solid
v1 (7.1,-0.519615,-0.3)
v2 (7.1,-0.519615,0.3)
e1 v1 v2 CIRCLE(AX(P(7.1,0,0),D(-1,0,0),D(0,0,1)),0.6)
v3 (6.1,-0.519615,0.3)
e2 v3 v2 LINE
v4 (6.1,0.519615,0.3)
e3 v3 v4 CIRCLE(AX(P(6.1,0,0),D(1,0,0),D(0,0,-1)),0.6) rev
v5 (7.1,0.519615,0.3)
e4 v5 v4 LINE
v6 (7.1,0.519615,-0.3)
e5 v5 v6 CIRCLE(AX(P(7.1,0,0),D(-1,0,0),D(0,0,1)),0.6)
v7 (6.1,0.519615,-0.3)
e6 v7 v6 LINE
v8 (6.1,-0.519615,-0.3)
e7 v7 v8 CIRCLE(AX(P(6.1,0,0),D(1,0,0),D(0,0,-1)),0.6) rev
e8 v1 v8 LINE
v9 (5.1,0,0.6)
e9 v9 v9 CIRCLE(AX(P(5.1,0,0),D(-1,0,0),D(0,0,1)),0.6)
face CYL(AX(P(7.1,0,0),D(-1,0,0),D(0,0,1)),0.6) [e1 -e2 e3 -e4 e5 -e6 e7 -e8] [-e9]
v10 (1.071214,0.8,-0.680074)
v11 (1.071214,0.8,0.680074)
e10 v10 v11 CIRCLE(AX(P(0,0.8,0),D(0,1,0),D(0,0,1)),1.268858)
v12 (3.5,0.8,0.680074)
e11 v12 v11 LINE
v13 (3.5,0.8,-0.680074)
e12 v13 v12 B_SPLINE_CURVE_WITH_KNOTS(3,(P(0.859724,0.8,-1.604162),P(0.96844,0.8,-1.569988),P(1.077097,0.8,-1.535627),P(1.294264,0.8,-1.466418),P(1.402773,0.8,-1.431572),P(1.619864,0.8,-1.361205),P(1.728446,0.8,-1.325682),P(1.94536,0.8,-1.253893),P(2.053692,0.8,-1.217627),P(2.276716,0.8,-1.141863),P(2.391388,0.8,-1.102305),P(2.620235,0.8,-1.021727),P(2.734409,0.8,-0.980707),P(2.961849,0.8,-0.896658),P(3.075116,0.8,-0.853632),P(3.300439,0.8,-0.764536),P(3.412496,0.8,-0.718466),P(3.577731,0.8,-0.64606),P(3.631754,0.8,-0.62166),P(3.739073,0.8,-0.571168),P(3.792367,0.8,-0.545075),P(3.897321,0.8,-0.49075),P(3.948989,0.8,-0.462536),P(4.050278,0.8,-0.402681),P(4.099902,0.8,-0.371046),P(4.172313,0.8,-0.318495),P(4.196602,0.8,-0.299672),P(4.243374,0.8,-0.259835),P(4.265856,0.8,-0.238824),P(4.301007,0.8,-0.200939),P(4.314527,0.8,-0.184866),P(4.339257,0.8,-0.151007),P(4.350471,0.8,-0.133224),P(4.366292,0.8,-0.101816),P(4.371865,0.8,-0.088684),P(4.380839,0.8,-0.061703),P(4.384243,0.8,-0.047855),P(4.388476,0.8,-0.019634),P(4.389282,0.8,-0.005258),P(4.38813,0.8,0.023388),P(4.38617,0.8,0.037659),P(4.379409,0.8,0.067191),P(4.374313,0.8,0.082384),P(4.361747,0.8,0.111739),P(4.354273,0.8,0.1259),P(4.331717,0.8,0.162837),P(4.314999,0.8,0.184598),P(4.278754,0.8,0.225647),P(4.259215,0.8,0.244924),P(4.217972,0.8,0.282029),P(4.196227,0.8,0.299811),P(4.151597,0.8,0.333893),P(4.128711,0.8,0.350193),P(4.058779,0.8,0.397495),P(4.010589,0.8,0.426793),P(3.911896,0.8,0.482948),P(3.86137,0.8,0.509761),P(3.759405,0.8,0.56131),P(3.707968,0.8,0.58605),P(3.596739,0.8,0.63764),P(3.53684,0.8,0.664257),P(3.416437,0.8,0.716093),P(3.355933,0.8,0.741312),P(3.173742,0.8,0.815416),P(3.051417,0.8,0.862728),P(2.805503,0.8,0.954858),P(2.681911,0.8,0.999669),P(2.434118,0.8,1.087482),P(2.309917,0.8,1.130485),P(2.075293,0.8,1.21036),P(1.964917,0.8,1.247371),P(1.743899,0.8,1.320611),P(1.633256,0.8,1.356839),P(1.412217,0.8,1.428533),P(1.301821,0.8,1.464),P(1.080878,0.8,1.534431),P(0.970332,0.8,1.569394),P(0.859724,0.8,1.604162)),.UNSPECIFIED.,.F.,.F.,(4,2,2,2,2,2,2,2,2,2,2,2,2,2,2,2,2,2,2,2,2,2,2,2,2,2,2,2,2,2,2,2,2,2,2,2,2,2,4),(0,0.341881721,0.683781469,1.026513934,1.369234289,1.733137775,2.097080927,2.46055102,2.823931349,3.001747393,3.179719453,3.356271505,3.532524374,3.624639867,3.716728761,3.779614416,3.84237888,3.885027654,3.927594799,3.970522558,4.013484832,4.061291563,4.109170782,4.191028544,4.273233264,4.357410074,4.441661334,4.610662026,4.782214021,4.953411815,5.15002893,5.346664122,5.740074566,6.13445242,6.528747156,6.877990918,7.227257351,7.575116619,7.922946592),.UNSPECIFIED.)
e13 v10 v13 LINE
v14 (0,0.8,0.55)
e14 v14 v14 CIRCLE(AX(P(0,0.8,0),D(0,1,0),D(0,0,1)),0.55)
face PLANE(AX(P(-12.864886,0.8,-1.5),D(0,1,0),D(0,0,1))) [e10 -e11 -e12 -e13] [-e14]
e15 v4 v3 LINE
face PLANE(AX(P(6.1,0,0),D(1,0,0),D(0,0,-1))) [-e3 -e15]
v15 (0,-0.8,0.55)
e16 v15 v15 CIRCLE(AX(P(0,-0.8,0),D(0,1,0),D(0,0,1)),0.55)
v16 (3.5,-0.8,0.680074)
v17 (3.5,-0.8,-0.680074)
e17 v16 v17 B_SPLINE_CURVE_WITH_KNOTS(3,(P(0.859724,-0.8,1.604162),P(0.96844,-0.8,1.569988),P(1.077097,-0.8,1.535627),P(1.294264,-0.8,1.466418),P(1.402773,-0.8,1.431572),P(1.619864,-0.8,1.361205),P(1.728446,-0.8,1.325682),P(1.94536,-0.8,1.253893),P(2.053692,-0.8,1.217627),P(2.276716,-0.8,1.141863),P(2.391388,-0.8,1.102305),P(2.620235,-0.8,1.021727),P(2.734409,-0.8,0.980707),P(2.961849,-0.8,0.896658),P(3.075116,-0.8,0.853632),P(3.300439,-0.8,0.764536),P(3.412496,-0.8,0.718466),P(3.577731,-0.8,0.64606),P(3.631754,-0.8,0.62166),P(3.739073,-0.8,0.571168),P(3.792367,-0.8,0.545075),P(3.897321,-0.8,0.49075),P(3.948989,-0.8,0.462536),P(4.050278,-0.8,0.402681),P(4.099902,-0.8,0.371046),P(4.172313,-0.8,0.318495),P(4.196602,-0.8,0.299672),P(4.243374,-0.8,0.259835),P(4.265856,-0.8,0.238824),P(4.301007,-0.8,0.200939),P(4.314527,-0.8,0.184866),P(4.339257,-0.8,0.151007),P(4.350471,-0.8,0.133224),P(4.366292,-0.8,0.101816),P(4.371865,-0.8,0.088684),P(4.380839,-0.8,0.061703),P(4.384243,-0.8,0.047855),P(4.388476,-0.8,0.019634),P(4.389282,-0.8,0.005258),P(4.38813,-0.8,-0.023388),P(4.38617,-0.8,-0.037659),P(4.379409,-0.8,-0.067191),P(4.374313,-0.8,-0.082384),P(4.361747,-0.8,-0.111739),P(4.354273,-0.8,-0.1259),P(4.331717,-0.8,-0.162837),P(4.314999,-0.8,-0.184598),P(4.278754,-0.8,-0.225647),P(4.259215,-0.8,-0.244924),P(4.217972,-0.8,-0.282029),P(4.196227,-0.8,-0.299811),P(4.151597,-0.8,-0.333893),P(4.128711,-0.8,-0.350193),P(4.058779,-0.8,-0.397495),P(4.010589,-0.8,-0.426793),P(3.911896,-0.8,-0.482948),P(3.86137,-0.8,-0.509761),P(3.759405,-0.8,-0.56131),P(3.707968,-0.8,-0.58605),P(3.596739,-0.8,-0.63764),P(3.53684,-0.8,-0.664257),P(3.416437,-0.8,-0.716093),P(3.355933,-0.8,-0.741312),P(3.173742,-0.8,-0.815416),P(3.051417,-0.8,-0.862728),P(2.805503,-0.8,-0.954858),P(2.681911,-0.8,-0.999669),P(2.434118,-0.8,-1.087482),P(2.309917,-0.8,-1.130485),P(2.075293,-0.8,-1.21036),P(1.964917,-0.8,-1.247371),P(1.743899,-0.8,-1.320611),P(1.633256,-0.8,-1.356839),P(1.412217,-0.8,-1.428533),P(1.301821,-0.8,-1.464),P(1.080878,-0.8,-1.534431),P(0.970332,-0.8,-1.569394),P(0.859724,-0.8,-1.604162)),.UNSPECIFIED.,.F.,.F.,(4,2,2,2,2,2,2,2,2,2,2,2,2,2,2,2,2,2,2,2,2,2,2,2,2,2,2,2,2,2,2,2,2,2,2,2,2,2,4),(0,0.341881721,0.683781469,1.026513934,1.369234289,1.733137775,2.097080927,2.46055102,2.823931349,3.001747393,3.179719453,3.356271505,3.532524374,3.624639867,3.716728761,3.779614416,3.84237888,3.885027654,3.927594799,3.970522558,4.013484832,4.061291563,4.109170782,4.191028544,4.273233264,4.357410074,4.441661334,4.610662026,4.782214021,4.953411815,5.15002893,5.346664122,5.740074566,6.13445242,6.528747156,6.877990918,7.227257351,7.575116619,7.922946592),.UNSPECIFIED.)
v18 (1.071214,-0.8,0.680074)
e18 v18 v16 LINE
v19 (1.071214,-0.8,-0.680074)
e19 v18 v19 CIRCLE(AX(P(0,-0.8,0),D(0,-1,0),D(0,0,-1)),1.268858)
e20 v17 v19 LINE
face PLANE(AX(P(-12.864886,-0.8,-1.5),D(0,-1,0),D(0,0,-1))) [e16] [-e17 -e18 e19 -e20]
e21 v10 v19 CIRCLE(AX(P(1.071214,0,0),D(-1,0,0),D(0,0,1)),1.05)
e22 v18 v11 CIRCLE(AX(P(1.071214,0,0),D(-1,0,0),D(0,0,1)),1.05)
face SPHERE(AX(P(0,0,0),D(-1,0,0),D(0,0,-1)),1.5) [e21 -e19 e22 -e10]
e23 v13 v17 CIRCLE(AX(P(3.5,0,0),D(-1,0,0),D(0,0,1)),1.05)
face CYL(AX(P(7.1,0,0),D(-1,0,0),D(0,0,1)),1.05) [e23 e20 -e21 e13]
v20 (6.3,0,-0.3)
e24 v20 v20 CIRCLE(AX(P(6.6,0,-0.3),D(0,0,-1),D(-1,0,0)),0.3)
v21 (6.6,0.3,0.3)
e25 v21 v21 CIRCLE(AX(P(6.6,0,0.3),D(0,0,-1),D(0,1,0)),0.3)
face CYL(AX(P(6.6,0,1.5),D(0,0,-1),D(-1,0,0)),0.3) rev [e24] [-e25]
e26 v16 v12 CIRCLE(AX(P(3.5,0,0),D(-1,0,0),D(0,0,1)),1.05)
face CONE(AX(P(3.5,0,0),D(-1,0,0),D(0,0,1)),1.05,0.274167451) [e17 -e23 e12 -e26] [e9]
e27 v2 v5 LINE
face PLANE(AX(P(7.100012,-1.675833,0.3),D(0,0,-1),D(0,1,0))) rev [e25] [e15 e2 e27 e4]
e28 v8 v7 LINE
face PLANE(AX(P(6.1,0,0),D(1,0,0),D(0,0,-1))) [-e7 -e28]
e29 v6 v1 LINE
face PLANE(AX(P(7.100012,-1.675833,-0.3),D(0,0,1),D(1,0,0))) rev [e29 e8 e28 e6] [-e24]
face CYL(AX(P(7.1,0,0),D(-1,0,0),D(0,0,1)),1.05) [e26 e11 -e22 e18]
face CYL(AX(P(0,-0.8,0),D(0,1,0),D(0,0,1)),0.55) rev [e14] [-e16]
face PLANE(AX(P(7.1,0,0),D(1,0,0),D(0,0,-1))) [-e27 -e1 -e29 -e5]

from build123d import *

# Parameters (mm, degrees)
CUT_EXTRUDE_START         = -1.5
CUT_EXTRUDE_1_OUTLINE_W   = 9
CUT_EXTRUDE_1_OUTLINE_H   = 6
CUT_EXTRUDE_1_DEPTH       = 0.7
CUT_EXTRUDE_START_2       = 0.8
CUT_EXTRUDE_1_2_OUTLINE_W = 9
CUT_EXTRUDE_1_2_OUTLINE_H = 6
CUT_EXTRUDE_1_2_DEPTH     = 0.7
CUT_EXTRUDE_2_DEPTH       = 8.431016081
CUT_EXTRUDE_2_DEPTH_BACK  = 8.431016081
SKETCH_4_R                = 0.55
CUT_EXTRUDE_3_DEPTH       = 9.766413178
CUT_EXTRUDE_3_DEPTH_BACK  = 1
SKETCH_5_OUTSIDE_W        = 6.85
SKETCH_5_OUTSIDE_H        = 5.45
SKETCH_5_OUTSIDE_W_2      = 0.6
SKETCH_5_OUTSIDE_H_2      = 3.351666402
SKETCH_7_R                = 0.3
CUT_EXTRUDE_5_DEPTH       = 8.368174808


# Read off the part's stored shape, not the designer's step: 切除-拉伸1
with BuildPart() as part:
    # 草图2 → 旋转1 (revolve)
    with BuildSketch(Plane(origin=(0, 0, 0), x_dir=(1, 0, 0), z_dir=(0, 1, 0)), mode=Mode.PRIVATE) as revolve_1_sk:
        with BuildLine():
            ThreePointArc((1.5, 0), (1.388672279, 0.567088443), (1.071214264, 1.05))
            ThreePointArc((1.071214264, 1.05), (-0.567088443, 1.388672279), (-1.5, 0))
            Line((-1.5, 0), (1.5, 0))
        make_face()
        with BuildLine():
            Line((3.5, 1.05), (1.071214264, 1.05))
            ThreePointArc((1.071214264, 1.05), (1.388672279, 0.567088443), (1.5, 0))
            Line((1.5, 0), (7.1, 0))
            Line((7.1, 0), (7.1, 0.6))
            Line((7.1, 0.6), (5.1, 0.6))
            Line((5.1, 0.6), (3.5, 1.05))
        make_face()
    revolve(revolve_1_sk.sketch.rotate(Axis((7.1, 0, 0), (1, 0, 0)), 180), axis=Axis((7.1, 0, 0), (1, 0, 0)))

    # 切除-拉伸1 outline → 切除-拉伸1 (cut)
    with BuildSketch(Plane(origin=(0, 0, 0), x_dir=(1, 0, 0), z_dir=(0, 1, 0)).offset(CUT_EXTRUDE_START)):
        with Locations((1.5, 0)):
            Rectangle(CUT_EXTRUDE_1_OUTLINE_W, CUT_EXTRUDE_1_OUTLINE_H)
    extrude(amount=CUT_EXTRUDE_1_DEPTH, mode=Mode.SUBTRACT)

    # Cut-Extrude 1 2 outline → Cut-Extrude 1 2 (cut)
    with BuildSketch(Plane(origin=(0, 0, 0), x_dir=(1, 0, 0), z_dir=(0, 1, 0)).offset(CUT_EXTRUDE_START_2)):
        with Locations((1.5, 0)):
            Rectangle(CUT_EXTRUDE_1_2_OUTLINE_W, CUT_EXTRUDE_1_2_OUTLINE_H)
    extrude(amount=CUT_EXTRUDE_1_2_DEPTH, mode=Mode.SUBTRACT)

    # 草图4 → 切除-拉伸2 (cut, two sides: drawn at the far end of the back side and taken through both)
    with BuildSketch(Plane(origin=(0, 0.8, 0), x_dir=(1, 0, 0), z_dir=(0, 1, 0)).offset(-CUT_EXTRUDE_2_DEPTH_BACK)):
        with Locations(Location((0, 0, 0), (0, 0, 270))):
            Circle(SKETCH_4_R)
    extrude(amount=CUT_EXTRUDE_2_DEPTH + CUT_EXTRUDE_2_DEPTH_BACK, mode=Mode.SUBTRACT)

    # 草图5 outside → 切除-拉伸3 (cut, two sides: drawn at the far end of the back side and taken through both)
    with BuildSketch(Plane(origin=(7.1, 0, 0), x_dir=(0, 0, -1), z_dir=(1, 0, 0)).offset(-CUT_EXTRUDE_3_DEPTH_BACK)):
        Rectangle(SKETCH_5_OUTSIDE_W, SKETCH_5_OUTSIDE_H)
        Rectangle(SKETCH_5_OUTSIDE_W_2, SKETCH_5_OUTSIDE_H_2, mode=Mode.SUBTRACT)
    extrude(amount=CUT_EXTRUDE_3_DEPTH + CUT_EXTRUDE_3_DEPTH_BACK, mode=Mode.SUBTRACT)

    # 草图7 → 切除-拉伸5 (cut, through all)
    with BuildSketch(Plane(origin=(0, 0, -0.3), x_dir=(-1, 0, 0), z_dir=(0, 0, -1))):
        with Locations((-6.6, 0)):
            Circle(SKETCH_7_R)
    extrude(amount=-CUT_EXTRUDE_5_DEPTH, mode=Mode.SUBTRACT)


solid = part.part
